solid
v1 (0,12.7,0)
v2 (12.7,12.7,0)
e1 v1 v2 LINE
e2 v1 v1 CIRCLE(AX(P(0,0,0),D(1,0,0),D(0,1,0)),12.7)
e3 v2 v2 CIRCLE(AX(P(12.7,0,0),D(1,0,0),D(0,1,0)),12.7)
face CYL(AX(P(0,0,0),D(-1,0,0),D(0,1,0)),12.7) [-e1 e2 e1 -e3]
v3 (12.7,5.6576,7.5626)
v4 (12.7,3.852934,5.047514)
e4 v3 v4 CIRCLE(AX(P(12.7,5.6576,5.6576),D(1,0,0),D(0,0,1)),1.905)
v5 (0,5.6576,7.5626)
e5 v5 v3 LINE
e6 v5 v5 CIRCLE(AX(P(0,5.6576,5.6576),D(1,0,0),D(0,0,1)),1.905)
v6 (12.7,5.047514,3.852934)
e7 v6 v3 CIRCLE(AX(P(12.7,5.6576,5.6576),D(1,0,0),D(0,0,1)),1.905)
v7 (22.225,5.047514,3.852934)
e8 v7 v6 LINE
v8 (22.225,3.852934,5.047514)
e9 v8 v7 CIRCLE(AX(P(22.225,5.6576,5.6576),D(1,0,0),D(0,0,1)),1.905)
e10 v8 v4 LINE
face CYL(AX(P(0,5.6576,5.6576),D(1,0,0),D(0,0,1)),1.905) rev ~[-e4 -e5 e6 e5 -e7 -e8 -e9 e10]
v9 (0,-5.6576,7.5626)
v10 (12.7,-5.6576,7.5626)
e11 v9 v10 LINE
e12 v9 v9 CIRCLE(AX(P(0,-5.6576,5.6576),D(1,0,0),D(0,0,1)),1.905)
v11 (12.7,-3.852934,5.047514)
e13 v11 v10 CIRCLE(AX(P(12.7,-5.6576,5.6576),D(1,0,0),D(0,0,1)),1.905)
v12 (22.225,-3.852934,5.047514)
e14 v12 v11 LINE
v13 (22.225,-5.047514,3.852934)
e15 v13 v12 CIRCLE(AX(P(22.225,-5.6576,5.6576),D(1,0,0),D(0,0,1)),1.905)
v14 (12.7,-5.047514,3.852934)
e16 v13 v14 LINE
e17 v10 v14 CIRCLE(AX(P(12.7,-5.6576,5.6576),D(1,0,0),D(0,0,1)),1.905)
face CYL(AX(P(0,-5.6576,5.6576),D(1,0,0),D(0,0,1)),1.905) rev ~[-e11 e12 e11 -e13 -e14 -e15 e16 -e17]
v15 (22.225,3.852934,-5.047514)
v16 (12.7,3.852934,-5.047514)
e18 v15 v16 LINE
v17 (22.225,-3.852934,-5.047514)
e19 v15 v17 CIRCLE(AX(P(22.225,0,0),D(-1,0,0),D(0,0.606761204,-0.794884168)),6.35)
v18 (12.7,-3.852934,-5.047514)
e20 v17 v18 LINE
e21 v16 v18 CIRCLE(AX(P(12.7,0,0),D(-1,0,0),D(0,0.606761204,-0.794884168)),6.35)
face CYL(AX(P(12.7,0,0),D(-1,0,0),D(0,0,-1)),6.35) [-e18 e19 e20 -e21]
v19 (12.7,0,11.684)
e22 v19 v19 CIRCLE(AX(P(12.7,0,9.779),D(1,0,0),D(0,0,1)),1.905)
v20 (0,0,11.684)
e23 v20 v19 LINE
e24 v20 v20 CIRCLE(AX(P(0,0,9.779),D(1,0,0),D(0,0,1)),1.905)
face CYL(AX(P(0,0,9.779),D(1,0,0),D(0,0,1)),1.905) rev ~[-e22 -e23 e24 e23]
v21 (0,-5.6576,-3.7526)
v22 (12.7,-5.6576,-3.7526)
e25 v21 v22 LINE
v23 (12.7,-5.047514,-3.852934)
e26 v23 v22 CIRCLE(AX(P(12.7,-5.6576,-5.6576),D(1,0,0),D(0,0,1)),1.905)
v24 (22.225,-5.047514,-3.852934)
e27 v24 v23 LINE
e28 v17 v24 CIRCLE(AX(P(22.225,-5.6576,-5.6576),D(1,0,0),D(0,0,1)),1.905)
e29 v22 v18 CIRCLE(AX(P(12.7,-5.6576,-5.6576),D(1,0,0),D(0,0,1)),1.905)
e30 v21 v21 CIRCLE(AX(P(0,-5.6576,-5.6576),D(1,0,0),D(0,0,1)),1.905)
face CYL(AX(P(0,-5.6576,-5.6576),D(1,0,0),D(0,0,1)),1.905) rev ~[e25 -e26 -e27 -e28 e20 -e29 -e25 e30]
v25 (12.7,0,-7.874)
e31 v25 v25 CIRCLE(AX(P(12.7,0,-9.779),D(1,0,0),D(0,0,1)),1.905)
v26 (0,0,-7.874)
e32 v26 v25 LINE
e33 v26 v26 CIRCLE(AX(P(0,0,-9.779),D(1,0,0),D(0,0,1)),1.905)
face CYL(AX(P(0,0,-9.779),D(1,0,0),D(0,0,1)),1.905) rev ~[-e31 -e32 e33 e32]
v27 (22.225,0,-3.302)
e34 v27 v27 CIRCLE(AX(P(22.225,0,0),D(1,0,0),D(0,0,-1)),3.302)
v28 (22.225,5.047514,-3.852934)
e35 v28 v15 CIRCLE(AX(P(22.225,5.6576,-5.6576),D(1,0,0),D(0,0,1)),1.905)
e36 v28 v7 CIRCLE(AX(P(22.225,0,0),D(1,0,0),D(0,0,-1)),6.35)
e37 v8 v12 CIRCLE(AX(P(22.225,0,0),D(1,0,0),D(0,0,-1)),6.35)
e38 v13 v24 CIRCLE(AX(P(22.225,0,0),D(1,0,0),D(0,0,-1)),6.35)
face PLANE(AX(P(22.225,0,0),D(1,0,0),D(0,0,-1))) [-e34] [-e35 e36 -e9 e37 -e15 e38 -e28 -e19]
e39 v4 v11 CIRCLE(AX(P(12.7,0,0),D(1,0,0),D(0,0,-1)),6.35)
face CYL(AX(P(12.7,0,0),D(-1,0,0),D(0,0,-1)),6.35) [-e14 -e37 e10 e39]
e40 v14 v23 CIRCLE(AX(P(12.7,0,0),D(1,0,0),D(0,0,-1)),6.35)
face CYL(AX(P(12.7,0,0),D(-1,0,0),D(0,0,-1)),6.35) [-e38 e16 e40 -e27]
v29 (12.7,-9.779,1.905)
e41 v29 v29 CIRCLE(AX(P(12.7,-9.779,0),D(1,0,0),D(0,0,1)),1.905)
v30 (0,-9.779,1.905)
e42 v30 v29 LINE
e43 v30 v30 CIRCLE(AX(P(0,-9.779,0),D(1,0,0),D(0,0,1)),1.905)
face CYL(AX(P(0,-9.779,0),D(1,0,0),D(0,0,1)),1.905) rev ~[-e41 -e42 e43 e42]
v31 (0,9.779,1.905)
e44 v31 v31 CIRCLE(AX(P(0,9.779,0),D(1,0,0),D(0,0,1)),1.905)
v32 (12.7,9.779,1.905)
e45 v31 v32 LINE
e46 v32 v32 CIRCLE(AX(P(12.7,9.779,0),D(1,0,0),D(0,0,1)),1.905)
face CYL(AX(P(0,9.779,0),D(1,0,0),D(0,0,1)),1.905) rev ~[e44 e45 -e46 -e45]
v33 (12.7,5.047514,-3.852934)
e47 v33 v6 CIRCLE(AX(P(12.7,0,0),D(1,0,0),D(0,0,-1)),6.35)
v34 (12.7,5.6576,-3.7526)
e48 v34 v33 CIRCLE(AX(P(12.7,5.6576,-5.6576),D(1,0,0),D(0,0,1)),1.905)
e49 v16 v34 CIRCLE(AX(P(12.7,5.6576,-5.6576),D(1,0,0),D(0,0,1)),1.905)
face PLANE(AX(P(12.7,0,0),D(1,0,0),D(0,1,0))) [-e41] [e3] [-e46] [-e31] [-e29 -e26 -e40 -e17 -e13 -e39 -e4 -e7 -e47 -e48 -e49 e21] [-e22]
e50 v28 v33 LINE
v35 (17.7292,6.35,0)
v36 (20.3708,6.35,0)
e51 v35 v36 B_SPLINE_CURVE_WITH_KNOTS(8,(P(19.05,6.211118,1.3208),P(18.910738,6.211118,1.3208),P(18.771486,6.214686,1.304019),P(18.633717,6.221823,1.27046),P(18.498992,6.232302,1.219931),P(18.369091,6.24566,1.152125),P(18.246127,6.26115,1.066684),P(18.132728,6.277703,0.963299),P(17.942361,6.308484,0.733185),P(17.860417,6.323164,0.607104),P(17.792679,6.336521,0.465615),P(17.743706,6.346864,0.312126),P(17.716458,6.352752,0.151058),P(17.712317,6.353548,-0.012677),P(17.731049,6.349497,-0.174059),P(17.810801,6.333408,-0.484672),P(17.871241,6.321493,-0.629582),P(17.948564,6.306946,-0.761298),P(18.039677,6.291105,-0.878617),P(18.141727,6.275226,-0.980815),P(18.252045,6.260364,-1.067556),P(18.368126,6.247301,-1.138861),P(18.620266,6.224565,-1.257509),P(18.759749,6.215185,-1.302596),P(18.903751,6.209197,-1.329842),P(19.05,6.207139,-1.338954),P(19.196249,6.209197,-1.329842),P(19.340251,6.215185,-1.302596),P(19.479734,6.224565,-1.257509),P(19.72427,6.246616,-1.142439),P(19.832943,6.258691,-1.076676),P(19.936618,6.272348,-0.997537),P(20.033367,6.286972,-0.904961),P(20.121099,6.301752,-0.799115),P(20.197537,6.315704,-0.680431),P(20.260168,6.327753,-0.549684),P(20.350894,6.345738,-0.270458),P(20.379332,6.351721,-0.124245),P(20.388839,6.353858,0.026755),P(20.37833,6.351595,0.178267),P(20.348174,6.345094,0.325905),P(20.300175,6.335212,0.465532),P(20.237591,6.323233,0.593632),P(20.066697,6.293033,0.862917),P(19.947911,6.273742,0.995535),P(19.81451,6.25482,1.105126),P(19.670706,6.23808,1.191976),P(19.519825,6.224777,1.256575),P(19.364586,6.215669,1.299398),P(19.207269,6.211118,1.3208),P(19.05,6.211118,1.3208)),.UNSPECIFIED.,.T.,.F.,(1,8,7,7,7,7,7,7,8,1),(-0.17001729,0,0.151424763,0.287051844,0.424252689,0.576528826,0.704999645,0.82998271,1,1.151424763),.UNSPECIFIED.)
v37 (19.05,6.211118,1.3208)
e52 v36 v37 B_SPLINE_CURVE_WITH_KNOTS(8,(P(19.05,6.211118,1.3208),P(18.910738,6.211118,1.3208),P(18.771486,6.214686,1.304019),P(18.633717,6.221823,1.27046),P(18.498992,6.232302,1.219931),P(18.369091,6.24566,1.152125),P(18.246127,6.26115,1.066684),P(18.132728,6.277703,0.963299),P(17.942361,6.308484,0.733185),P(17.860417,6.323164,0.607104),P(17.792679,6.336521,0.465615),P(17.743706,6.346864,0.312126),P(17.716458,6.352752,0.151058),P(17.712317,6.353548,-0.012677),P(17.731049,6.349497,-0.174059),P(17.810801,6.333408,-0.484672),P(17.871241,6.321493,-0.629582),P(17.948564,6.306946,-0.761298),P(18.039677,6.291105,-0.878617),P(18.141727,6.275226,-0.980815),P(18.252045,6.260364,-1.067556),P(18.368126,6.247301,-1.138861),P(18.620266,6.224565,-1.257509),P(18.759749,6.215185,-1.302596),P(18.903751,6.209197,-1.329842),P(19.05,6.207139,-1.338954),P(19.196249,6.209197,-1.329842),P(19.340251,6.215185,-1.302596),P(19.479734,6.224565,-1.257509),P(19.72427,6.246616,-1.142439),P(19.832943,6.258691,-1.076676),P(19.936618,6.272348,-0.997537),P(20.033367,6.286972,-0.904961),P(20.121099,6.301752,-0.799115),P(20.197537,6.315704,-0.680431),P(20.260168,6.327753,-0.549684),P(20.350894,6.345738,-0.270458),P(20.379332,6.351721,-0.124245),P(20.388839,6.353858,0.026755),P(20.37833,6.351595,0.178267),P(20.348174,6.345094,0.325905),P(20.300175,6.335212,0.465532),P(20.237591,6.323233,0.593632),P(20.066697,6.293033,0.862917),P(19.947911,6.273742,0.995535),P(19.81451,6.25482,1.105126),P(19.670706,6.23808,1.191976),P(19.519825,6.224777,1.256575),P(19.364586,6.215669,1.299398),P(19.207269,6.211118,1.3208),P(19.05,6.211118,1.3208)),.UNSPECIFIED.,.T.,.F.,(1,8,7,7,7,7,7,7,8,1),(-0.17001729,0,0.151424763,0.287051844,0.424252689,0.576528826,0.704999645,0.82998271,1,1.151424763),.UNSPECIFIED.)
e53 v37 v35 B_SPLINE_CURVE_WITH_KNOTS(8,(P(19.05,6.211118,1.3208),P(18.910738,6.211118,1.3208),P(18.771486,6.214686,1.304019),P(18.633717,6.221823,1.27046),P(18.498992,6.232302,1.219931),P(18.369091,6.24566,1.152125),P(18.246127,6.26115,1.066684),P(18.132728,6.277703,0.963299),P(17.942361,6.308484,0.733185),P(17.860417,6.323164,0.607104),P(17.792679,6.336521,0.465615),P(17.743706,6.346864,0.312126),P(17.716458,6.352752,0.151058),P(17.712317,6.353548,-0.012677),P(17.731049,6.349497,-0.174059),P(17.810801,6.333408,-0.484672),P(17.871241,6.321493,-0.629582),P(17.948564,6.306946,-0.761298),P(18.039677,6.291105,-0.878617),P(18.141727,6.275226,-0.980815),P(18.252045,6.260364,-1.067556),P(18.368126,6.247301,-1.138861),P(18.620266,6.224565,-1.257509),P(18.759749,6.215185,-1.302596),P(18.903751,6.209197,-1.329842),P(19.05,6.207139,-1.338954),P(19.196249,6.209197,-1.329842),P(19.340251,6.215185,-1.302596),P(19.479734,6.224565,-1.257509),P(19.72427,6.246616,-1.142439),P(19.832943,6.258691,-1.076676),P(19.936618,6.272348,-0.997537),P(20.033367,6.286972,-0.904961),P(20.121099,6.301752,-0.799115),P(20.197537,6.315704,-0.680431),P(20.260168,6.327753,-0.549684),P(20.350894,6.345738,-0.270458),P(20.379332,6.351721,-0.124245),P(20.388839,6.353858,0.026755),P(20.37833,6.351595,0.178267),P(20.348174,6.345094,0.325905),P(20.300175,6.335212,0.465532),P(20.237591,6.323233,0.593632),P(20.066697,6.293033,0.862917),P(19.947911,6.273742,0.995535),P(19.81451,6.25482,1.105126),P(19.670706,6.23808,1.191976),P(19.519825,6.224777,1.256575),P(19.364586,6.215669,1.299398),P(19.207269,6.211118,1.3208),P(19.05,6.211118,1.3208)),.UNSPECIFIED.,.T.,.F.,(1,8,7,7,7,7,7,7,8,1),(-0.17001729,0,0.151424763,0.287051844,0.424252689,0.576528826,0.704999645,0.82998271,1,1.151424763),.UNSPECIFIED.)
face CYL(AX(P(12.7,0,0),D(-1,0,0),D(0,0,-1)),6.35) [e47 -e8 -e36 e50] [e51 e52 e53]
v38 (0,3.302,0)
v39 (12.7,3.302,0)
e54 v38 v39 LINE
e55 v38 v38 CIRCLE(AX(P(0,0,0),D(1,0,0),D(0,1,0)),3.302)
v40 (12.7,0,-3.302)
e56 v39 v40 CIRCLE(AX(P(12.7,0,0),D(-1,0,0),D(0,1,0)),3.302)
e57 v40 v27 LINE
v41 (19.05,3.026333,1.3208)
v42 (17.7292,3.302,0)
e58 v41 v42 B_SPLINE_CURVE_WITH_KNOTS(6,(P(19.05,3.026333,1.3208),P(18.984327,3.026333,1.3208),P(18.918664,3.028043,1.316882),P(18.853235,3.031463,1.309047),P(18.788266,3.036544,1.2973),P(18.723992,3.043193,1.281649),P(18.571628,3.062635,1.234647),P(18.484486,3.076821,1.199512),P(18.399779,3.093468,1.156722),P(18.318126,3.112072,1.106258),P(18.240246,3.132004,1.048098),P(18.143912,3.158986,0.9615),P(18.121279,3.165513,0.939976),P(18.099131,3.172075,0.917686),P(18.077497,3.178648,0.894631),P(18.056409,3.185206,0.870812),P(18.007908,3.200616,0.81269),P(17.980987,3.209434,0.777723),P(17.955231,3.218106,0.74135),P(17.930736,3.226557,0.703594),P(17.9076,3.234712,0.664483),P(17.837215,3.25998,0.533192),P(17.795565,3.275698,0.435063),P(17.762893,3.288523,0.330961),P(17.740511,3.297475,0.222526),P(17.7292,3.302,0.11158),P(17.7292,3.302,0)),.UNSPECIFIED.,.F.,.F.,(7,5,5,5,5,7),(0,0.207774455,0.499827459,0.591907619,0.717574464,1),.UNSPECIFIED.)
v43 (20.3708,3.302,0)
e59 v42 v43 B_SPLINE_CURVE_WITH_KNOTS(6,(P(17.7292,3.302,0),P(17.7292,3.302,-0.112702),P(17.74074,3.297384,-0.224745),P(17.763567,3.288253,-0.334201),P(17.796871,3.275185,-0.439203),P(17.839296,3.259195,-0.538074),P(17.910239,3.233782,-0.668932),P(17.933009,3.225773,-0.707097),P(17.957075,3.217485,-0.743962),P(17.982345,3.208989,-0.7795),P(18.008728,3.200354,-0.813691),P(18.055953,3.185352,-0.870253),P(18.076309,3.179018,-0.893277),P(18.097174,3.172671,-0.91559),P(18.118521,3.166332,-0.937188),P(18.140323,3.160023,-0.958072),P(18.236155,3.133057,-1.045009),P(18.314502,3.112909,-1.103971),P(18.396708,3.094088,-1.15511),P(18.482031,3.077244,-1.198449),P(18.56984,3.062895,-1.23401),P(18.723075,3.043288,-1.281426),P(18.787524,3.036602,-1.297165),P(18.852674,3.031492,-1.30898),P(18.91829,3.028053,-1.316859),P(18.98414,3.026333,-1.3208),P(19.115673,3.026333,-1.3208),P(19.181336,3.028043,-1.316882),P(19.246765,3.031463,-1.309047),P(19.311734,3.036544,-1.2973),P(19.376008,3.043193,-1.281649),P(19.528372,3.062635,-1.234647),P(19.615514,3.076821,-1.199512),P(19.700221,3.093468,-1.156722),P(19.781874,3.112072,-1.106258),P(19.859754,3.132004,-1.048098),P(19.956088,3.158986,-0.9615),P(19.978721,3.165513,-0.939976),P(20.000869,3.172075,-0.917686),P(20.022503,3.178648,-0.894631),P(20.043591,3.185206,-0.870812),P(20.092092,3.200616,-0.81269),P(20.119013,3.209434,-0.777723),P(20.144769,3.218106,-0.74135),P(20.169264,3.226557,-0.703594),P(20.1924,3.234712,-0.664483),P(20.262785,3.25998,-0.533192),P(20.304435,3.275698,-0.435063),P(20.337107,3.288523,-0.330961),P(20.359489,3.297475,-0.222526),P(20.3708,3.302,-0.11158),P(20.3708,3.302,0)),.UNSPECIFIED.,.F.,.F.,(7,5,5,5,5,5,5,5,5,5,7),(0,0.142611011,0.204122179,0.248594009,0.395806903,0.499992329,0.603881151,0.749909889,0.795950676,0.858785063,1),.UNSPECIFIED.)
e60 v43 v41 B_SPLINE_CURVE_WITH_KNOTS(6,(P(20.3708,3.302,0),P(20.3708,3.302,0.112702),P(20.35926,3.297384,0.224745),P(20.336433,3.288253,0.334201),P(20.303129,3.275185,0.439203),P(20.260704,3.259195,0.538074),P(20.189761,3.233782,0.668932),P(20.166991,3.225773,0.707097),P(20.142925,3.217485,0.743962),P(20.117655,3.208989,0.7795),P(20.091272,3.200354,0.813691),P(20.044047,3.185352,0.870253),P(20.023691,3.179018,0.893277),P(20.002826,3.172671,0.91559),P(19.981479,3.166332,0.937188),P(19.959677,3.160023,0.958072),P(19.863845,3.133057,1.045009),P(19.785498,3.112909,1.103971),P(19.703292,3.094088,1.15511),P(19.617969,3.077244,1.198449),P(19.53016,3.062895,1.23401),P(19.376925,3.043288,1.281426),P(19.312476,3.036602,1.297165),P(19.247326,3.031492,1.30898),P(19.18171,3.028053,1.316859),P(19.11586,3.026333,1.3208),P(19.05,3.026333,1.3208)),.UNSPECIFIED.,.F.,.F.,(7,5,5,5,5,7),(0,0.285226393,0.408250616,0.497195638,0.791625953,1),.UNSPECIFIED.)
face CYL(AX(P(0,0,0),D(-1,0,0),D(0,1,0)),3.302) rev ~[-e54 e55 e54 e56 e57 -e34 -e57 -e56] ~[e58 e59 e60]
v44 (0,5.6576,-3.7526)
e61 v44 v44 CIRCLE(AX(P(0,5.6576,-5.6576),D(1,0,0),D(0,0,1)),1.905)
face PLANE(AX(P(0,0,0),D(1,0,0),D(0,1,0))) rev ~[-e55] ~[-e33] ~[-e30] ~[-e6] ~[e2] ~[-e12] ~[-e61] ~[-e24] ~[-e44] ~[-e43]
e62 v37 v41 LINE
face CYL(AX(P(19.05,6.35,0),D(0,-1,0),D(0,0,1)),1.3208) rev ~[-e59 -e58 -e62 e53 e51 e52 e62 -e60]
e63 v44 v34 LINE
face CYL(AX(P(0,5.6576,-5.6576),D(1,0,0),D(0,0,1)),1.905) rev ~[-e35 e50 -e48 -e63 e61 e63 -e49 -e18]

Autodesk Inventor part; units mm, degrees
ref_plane "YZ Plane" through (0, 0, 0) normal (1, 0, 0) x (0, 1, 0)
ref_plane "XY Plane" through (0, 0, 0) normal (0, 0, 1) x (1, 0, 0)
sketch "Sketch1" plane through (0, 0, 0) normal (1, 0, 0) x (0, 1, 0)
  circle A0 centre (0, 0) radius 12.7
  line L0 (5.6576, -5.6576) -> (0, 0)
  line L1 (0, 0.0631) -> (0, -4.7425)
  circle A1 centre (0, 0) radius 3.302
  point P0 (5.6576, 5.6576)
  point P1 (-5.6576, 5.6576)
  point P2 (-5.6576, -5.6576)
  point P3 (9.779, 0)
  point P4 (0, 9.779)
  point P5 (-9.779, 0)
  point P6 (0, -9.779)
  point P7 (5.6576, 5.6576)
  point P8 (-5.6576, 5.6576)
  point P9 (-5.6576, -5.6576)
  dimension "d0" = 25.4
  dimension "d6" = 45
  dimension "d15" = 6.604
  dimension "d23" = 360
  dimension "d25" = 9.779
  dimension "d28" = 360
extrude "Extrusion1" add sketch "Sketch1" along normal blind 12.7
sketch "Sketch2" plane through (12.7, 0, 0) normal (1, 0, 0) x (0, 0, -1)
  circle A0 centre (0, 0) radius 3.302 projected
  circle A1 centre (0, 0) radius 6.35
  point P0 (0, 0)
  dimension "d18" = 12.7
extrude "Extrusion2" add sketch "Sketch2" along normal blind 9.525
hole "Hole1" at (0, 9.779, 0) at (0, 0, 9.779) at (0, -9.779, 0) at (0, 0, -9.779) direction (1, 0, 0) diameter 3.81 end through all
hole "Hole2" at (0, 5.6576, 5.6576) at (0, -5.6576, 5.6576) at (0, -5.6576, -5.6576) at (0, 5.6576, -5.6576) direction (1, 0, 0) diameter 3.81 end through all
ref_plane "Work Plane2" through (12.7, 6.35, 0) normal (0, 1, 0) x (-1, 0, 0)
sketch "Sketch5" plane through (12.7, 6.35, 0) normal (0, 1, 0) x (-1, 0, 0)
  line L0 (0, 3.8529) -> (-9.525, 3.8529) projected
  line L1 (-9.525, -3.8529) -> (-9.525, 3.8529) projected
  line L2 (-9.525, -3.8529) -> (0, -3.8529) projected
  line L3 (0, 3.8529) -> (0, -3.8529) projected
  point P0 (12.7, 0)
  point P1 (-6.35, 0)
  dimension "d46" = 3.175
hole "Hole3" at (19.05, 6.35, 0) direction (0, -1, 0) diameter 2.6416 end up to surface thread size "6-32 UNC" class "2B" standard "ANSI Unified Screw Threads"
properties part number "WheelandSprocketComboHub" material "Aluminum 6061"
